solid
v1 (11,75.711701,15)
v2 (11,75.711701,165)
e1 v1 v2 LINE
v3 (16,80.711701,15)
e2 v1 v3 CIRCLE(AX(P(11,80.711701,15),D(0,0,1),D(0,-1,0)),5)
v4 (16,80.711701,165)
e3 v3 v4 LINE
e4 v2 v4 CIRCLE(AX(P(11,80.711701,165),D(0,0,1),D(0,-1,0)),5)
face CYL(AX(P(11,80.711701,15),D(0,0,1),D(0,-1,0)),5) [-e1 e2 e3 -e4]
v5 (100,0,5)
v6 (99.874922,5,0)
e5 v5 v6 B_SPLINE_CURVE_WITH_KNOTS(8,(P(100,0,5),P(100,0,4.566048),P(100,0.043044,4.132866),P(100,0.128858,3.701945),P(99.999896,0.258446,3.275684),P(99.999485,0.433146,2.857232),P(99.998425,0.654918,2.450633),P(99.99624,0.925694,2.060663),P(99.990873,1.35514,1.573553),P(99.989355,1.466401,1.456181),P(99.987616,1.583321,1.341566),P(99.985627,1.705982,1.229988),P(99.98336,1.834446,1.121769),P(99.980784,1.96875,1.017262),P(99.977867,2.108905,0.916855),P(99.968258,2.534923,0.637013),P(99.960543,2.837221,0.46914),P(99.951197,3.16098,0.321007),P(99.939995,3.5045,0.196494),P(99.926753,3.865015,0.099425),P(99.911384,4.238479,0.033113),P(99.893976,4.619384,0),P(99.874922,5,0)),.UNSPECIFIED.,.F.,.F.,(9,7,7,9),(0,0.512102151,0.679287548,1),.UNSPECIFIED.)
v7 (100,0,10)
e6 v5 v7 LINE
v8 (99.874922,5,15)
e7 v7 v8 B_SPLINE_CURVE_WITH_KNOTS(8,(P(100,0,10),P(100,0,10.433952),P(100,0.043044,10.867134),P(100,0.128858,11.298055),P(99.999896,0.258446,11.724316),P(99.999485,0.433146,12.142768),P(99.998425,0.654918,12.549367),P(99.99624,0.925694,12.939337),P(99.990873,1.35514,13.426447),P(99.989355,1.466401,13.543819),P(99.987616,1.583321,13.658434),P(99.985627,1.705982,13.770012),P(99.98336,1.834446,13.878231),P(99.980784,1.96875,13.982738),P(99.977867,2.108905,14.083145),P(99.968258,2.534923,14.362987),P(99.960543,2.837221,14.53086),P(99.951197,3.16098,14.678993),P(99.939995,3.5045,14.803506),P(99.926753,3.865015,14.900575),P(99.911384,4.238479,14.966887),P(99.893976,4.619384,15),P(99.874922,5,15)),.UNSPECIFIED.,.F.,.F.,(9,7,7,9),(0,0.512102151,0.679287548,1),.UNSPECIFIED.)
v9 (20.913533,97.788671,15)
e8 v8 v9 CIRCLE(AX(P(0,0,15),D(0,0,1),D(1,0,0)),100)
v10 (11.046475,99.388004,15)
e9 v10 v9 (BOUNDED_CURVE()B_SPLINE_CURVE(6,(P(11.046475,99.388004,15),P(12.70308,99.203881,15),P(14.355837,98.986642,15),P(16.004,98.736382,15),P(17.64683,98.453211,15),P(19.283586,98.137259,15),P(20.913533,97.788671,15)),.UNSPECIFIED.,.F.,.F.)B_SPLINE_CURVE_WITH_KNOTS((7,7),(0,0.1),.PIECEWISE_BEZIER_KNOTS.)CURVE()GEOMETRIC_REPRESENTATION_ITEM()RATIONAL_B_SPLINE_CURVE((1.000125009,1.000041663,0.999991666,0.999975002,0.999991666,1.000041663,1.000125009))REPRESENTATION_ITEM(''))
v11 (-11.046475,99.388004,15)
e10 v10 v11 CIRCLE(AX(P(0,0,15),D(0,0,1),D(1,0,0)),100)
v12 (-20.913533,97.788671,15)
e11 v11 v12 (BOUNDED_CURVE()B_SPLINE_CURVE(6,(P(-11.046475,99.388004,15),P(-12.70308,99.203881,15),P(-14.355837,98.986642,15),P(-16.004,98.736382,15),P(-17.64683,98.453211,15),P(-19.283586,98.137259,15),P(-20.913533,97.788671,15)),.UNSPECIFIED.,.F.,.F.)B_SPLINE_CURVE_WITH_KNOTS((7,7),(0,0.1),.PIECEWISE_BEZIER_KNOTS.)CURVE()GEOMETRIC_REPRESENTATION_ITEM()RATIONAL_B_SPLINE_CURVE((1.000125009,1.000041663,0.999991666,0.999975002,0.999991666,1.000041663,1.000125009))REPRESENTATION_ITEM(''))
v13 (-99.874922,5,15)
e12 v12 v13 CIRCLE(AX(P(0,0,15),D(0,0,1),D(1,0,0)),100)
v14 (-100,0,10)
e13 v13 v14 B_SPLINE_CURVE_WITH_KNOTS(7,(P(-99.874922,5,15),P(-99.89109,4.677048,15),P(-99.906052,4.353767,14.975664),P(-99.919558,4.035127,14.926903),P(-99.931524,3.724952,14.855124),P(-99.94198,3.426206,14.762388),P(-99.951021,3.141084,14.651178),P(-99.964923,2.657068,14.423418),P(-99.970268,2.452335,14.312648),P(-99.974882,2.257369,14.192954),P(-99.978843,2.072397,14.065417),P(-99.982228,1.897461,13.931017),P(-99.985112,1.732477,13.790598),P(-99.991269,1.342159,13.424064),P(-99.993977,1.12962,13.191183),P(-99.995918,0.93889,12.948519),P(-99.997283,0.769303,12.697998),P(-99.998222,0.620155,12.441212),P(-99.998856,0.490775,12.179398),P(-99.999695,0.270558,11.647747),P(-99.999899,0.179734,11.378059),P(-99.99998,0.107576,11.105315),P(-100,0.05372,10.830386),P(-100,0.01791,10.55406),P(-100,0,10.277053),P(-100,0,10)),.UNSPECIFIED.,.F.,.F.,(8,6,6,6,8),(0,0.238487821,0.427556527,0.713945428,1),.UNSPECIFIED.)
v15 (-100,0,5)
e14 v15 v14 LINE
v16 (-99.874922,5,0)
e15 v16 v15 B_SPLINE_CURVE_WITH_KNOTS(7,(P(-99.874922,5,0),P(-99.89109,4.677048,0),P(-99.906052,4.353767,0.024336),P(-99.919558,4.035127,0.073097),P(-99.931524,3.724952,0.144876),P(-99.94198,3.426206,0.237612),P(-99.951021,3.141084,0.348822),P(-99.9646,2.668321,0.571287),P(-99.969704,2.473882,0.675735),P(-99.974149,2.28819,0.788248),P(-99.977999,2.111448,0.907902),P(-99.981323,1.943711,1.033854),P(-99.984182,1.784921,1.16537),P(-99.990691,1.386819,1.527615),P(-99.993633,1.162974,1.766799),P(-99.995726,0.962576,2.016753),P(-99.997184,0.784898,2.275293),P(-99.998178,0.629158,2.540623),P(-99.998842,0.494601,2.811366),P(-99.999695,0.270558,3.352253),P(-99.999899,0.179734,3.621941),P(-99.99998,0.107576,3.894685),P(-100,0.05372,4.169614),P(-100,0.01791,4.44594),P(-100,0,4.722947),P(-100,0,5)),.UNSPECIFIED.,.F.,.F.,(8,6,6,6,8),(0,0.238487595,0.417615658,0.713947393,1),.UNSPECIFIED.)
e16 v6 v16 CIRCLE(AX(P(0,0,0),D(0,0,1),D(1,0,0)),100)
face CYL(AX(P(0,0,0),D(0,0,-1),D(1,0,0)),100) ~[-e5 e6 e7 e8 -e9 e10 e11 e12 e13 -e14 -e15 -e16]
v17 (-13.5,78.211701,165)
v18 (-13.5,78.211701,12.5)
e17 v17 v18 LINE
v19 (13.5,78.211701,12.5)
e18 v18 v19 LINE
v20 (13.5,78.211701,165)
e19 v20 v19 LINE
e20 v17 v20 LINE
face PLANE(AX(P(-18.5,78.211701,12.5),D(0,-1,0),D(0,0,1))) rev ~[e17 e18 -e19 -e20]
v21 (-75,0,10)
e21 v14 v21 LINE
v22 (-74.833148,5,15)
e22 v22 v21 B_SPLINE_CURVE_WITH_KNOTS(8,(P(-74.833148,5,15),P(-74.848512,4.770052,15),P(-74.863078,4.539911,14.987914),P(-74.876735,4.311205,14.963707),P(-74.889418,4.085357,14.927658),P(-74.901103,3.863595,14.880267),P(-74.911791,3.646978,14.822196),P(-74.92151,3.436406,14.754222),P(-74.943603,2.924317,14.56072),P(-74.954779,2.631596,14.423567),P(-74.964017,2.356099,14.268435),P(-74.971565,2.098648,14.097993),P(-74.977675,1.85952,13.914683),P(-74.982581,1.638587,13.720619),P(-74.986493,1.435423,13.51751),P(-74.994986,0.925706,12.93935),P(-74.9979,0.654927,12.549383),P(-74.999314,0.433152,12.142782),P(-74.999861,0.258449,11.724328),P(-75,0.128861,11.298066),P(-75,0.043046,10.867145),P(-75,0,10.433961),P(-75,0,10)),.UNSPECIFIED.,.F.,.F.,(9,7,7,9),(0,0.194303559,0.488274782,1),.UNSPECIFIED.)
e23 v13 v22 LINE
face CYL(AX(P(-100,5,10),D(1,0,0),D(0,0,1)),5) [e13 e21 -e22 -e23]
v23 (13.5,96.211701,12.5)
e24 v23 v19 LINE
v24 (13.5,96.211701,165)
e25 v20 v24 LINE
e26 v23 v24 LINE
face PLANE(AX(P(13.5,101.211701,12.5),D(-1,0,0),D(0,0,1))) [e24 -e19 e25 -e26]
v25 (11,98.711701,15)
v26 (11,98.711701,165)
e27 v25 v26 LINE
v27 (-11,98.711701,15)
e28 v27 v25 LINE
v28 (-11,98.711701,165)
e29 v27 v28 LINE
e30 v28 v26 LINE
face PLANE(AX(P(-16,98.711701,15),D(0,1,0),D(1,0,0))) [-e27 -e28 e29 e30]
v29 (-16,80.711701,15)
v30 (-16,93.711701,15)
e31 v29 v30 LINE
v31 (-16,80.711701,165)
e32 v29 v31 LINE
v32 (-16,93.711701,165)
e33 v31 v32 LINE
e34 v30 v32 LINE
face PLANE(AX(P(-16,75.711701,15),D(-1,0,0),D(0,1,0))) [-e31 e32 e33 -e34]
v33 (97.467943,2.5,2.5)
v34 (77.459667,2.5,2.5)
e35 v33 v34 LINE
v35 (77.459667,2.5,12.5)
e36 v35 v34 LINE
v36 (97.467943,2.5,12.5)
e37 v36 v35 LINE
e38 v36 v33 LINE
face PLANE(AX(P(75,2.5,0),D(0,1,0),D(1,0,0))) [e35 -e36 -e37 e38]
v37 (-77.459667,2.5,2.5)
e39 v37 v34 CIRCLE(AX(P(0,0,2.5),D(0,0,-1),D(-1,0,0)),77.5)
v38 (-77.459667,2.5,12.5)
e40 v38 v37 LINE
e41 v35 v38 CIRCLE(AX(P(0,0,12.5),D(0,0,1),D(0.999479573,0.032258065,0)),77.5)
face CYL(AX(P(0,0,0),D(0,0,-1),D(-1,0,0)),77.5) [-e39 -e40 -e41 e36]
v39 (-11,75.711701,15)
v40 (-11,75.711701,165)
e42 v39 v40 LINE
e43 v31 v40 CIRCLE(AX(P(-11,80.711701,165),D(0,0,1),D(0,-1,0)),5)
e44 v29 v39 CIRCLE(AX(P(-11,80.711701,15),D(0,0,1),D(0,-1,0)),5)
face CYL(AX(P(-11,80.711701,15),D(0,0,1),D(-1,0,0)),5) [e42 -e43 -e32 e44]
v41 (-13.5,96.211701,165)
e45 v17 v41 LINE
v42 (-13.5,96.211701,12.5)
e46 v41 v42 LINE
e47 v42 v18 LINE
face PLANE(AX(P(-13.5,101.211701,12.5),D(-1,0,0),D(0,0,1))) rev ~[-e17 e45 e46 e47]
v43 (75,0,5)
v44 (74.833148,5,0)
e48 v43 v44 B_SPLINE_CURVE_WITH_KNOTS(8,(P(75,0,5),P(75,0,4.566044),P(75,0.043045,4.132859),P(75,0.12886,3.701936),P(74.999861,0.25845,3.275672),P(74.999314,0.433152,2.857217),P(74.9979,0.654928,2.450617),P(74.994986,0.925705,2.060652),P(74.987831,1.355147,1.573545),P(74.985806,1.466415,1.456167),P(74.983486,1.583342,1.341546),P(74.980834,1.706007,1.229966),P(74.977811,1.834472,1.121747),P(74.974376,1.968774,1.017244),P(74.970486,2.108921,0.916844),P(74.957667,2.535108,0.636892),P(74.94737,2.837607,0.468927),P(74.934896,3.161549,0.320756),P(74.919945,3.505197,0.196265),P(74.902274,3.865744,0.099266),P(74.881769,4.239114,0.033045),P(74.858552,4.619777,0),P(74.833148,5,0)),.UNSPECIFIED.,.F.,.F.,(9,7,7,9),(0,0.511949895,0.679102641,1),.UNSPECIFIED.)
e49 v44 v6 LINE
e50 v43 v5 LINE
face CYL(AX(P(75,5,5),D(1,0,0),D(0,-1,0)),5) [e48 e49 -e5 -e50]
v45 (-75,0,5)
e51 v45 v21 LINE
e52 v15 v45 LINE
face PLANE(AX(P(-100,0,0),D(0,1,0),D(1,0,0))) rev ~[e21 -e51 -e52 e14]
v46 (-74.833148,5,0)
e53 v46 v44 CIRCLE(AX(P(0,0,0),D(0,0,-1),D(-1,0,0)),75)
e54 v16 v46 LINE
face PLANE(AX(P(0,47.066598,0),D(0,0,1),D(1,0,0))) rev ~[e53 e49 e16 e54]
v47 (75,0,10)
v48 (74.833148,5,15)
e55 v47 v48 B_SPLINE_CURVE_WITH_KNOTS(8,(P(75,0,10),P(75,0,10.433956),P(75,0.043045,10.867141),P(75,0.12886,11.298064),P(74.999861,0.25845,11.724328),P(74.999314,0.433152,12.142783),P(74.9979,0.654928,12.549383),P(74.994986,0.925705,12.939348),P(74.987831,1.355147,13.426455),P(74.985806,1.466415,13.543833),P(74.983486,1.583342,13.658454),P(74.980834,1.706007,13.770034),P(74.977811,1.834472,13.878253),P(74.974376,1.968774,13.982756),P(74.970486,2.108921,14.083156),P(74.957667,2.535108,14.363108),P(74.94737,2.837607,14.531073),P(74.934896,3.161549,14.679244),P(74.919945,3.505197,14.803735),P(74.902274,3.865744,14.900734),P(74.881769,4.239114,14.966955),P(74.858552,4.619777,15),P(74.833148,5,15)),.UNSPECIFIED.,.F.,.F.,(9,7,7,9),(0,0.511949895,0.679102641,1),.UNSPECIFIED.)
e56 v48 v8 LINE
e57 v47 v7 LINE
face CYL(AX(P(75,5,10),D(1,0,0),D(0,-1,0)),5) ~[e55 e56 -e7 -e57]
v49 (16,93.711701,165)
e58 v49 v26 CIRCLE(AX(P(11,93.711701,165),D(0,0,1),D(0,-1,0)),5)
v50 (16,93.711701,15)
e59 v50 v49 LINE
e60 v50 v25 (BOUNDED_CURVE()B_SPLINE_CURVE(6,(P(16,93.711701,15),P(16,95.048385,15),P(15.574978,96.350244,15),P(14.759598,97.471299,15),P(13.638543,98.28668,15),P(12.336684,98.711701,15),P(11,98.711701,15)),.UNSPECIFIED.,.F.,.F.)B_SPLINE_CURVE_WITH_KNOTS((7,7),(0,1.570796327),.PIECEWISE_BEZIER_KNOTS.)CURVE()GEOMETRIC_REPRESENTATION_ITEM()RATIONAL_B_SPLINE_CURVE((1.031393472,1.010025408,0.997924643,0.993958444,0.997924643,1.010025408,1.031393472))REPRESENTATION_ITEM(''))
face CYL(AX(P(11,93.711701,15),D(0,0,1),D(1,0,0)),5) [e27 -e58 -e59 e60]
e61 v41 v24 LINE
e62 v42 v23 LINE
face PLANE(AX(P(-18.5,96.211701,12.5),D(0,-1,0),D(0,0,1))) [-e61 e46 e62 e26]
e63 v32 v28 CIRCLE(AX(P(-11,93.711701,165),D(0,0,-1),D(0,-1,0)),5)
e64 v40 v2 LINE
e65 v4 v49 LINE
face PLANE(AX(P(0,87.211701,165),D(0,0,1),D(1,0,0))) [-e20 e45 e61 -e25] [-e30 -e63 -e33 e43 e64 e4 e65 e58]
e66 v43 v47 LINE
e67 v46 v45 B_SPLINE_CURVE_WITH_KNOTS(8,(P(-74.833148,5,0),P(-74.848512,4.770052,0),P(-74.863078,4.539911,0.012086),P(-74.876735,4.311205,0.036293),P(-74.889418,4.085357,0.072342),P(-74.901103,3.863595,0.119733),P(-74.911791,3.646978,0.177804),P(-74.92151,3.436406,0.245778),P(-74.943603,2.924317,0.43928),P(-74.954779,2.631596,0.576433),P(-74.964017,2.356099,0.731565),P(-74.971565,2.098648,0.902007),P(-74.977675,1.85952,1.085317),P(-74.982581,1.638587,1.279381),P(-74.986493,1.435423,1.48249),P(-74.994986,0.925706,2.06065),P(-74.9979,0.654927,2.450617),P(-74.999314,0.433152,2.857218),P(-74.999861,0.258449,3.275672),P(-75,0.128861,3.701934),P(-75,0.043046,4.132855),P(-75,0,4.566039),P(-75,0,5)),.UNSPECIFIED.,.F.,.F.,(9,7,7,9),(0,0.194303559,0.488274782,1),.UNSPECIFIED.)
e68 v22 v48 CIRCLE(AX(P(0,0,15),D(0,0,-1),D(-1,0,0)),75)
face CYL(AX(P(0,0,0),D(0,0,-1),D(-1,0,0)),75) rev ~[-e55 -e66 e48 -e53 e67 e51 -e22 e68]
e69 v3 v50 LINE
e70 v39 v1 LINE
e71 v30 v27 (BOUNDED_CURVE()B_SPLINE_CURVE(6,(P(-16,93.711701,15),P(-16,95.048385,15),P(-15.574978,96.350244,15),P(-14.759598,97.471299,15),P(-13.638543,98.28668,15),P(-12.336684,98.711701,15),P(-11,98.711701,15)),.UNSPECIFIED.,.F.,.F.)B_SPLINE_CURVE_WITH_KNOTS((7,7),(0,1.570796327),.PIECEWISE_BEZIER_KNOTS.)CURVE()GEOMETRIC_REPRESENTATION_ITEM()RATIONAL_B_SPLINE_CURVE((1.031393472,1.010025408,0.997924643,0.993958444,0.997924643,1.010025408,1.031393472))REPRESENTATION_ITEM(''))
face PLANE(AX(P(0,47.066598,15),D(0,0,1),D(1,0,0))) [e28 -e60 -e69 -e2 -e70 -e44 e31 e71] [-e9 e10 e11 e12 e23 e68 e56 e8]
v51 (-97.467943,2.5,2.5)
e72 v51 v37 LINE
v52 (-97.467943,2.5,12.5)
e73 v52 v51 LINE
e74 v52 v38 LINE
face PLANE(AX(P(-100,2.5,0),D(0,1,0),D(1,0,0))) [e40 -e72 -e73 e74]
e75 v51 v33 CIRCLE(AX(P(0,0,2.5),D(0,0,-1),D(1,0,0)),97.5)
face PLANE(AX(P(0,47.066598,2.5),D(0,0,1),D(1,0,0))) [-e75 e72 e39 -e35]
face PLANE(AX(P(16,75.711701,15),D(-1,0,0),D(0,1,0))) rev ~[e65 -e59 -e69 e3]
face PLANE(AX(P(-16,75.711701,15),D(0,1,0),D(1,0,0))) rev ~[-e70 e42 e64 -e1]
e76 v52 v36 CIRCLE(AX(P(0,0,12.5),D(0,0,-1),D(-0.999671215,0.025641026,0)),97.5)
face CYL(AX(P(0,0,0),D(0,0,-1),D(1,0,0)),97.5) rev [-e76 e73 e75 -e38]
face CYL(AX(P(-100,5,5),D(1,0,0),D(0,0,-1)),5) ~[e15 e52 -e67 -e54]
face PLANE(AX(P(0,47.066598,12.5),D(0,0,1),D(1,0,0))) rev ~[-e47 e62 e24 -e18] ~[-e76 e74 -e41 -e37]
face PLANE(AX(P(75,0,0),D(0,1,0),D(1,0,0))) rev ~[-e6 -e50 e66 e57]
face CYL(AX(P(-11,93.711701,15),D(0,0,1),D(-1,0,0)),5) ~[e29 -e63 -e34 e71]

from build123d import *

# Parameters (mm, degrees)
F1_DEPTH    = 15
F2_W        = 32
F2_H        = 23
F3_DEPTH    = 150
F4_T        = 2.5
F4_T3_DEPTH = 28
F4_T5_DEPTH = 37
F5_R        = 5


# Not quite as in the source:
# - a shell that OpenCascade refuses in one call is made with other operations: the cavity is built on its own and cut out


with BuildPart() as f1:
    # F0 (on Top) → F1 (new body)
    with BuildSketch(Plane.XY):
        with BuildLine():
            Line((75, 0), (100, 0))
            ThreePointArc((100, 0), (0, 100), (-100, 0))
            Line((-100, 0), (-75, 0))
            ThreePointArc((-75, 0), (0, 75), (75, 0))
        make_face()
    extrude(amount=F1_DEPTH)

    # F2 (on face) → F3 (join)
    with BuildSketch(Plane.XY.offset(15)):
        with Locations((0, 87.211701434)):
            Rectangle(F2_W, F2_H)
    extrude(amount=F3_DEPTH)

    # F4: shell of thickness 2.5, made by hand


with BuildPart() as f4_core1:
    # F4_t2: copy of F1
    add(f1.part)

    # the walls: a layer under each face that stays
    f4_faces = [f4_core1.faces().sort_by_distance(p)[0] for p in [
        (-87.5, 0, 7.5),
        (0, 100, 7.5),
        (0, 75, 7.5),
        (-66.6666666667, 50, 0),
        (-66.6666666667, 49.355850717, 15),
        (87.5, 0, 7.5),
        (0, 99.355850717, 15),
        (-16, 87.211701434, 90),
        (0, 75.711701434, 90),
        (16, 87.211701434, 90),
        (0, 98.711701434, 90),
    ]]
    thicken(f4_faces, amount=-F4_T, mode=Mode.SUBTRACT)

    # F4_s4 → F4_t3 (cut)
    with BuildSketch(Plane.XZ.offset(-101.211701434)):
        Polygon((-16.025, 15.025), (-16, 12.5), (-13.5, 12.5), (-13.5, 15), align=None)
        Polygon((16.025, 15.025), (16, 12.5), (13.5, 12.5), (13.5, 15), align=None)
    extrude(amount=F4_T3_DEPTH, mode=Mode.SUBTRACT)

    # F4_s6 → F4_t5 (cut)
    with BuildSketch(Plane.YZ.offset(-18.5)):
        Polygon((75.686701434, 15.025), (75.711701434, 12.5), (78.211701434, 12.5), (78.211701434, 15), align=None)
        Polygon((98.736701434, 15.025), (98.711701434, 12.5), (96.211701434, 12.5), (96.211701434, 15), align=None)
    extrude(amount=F4_T5_DEPTH, mode=Mode.SUBTRACT)


with BuildPart() as f1_1:
    add(f1.part)

    # what is left inside the walls is the cavity
    f4_cavity = [f4_core1.part.solids().sort_by_distance(p)[0] for p in [
        (-48.733972, 65.833333, 2.525),
    ]]
    add(f4_cavity, mode=Mode.SUBTRACT)

    # F5
    f5_edges = [f1_1.edges().sort_by_distance(p)[0] for p in [
        (-16, 75.711701, 90),
        (-16, 98.711701, 90),
        (16, 98.711701, 90),
        (16, 75.711701, 90),
        (-87.5, 0, 15),
        (-87.5, 0, 0),
        (87.5, 0, 15),
        (87.5, 0, 0),
    ]]
    fillet(f5_edges, radius=F5_R)


solid = f1_1.part
